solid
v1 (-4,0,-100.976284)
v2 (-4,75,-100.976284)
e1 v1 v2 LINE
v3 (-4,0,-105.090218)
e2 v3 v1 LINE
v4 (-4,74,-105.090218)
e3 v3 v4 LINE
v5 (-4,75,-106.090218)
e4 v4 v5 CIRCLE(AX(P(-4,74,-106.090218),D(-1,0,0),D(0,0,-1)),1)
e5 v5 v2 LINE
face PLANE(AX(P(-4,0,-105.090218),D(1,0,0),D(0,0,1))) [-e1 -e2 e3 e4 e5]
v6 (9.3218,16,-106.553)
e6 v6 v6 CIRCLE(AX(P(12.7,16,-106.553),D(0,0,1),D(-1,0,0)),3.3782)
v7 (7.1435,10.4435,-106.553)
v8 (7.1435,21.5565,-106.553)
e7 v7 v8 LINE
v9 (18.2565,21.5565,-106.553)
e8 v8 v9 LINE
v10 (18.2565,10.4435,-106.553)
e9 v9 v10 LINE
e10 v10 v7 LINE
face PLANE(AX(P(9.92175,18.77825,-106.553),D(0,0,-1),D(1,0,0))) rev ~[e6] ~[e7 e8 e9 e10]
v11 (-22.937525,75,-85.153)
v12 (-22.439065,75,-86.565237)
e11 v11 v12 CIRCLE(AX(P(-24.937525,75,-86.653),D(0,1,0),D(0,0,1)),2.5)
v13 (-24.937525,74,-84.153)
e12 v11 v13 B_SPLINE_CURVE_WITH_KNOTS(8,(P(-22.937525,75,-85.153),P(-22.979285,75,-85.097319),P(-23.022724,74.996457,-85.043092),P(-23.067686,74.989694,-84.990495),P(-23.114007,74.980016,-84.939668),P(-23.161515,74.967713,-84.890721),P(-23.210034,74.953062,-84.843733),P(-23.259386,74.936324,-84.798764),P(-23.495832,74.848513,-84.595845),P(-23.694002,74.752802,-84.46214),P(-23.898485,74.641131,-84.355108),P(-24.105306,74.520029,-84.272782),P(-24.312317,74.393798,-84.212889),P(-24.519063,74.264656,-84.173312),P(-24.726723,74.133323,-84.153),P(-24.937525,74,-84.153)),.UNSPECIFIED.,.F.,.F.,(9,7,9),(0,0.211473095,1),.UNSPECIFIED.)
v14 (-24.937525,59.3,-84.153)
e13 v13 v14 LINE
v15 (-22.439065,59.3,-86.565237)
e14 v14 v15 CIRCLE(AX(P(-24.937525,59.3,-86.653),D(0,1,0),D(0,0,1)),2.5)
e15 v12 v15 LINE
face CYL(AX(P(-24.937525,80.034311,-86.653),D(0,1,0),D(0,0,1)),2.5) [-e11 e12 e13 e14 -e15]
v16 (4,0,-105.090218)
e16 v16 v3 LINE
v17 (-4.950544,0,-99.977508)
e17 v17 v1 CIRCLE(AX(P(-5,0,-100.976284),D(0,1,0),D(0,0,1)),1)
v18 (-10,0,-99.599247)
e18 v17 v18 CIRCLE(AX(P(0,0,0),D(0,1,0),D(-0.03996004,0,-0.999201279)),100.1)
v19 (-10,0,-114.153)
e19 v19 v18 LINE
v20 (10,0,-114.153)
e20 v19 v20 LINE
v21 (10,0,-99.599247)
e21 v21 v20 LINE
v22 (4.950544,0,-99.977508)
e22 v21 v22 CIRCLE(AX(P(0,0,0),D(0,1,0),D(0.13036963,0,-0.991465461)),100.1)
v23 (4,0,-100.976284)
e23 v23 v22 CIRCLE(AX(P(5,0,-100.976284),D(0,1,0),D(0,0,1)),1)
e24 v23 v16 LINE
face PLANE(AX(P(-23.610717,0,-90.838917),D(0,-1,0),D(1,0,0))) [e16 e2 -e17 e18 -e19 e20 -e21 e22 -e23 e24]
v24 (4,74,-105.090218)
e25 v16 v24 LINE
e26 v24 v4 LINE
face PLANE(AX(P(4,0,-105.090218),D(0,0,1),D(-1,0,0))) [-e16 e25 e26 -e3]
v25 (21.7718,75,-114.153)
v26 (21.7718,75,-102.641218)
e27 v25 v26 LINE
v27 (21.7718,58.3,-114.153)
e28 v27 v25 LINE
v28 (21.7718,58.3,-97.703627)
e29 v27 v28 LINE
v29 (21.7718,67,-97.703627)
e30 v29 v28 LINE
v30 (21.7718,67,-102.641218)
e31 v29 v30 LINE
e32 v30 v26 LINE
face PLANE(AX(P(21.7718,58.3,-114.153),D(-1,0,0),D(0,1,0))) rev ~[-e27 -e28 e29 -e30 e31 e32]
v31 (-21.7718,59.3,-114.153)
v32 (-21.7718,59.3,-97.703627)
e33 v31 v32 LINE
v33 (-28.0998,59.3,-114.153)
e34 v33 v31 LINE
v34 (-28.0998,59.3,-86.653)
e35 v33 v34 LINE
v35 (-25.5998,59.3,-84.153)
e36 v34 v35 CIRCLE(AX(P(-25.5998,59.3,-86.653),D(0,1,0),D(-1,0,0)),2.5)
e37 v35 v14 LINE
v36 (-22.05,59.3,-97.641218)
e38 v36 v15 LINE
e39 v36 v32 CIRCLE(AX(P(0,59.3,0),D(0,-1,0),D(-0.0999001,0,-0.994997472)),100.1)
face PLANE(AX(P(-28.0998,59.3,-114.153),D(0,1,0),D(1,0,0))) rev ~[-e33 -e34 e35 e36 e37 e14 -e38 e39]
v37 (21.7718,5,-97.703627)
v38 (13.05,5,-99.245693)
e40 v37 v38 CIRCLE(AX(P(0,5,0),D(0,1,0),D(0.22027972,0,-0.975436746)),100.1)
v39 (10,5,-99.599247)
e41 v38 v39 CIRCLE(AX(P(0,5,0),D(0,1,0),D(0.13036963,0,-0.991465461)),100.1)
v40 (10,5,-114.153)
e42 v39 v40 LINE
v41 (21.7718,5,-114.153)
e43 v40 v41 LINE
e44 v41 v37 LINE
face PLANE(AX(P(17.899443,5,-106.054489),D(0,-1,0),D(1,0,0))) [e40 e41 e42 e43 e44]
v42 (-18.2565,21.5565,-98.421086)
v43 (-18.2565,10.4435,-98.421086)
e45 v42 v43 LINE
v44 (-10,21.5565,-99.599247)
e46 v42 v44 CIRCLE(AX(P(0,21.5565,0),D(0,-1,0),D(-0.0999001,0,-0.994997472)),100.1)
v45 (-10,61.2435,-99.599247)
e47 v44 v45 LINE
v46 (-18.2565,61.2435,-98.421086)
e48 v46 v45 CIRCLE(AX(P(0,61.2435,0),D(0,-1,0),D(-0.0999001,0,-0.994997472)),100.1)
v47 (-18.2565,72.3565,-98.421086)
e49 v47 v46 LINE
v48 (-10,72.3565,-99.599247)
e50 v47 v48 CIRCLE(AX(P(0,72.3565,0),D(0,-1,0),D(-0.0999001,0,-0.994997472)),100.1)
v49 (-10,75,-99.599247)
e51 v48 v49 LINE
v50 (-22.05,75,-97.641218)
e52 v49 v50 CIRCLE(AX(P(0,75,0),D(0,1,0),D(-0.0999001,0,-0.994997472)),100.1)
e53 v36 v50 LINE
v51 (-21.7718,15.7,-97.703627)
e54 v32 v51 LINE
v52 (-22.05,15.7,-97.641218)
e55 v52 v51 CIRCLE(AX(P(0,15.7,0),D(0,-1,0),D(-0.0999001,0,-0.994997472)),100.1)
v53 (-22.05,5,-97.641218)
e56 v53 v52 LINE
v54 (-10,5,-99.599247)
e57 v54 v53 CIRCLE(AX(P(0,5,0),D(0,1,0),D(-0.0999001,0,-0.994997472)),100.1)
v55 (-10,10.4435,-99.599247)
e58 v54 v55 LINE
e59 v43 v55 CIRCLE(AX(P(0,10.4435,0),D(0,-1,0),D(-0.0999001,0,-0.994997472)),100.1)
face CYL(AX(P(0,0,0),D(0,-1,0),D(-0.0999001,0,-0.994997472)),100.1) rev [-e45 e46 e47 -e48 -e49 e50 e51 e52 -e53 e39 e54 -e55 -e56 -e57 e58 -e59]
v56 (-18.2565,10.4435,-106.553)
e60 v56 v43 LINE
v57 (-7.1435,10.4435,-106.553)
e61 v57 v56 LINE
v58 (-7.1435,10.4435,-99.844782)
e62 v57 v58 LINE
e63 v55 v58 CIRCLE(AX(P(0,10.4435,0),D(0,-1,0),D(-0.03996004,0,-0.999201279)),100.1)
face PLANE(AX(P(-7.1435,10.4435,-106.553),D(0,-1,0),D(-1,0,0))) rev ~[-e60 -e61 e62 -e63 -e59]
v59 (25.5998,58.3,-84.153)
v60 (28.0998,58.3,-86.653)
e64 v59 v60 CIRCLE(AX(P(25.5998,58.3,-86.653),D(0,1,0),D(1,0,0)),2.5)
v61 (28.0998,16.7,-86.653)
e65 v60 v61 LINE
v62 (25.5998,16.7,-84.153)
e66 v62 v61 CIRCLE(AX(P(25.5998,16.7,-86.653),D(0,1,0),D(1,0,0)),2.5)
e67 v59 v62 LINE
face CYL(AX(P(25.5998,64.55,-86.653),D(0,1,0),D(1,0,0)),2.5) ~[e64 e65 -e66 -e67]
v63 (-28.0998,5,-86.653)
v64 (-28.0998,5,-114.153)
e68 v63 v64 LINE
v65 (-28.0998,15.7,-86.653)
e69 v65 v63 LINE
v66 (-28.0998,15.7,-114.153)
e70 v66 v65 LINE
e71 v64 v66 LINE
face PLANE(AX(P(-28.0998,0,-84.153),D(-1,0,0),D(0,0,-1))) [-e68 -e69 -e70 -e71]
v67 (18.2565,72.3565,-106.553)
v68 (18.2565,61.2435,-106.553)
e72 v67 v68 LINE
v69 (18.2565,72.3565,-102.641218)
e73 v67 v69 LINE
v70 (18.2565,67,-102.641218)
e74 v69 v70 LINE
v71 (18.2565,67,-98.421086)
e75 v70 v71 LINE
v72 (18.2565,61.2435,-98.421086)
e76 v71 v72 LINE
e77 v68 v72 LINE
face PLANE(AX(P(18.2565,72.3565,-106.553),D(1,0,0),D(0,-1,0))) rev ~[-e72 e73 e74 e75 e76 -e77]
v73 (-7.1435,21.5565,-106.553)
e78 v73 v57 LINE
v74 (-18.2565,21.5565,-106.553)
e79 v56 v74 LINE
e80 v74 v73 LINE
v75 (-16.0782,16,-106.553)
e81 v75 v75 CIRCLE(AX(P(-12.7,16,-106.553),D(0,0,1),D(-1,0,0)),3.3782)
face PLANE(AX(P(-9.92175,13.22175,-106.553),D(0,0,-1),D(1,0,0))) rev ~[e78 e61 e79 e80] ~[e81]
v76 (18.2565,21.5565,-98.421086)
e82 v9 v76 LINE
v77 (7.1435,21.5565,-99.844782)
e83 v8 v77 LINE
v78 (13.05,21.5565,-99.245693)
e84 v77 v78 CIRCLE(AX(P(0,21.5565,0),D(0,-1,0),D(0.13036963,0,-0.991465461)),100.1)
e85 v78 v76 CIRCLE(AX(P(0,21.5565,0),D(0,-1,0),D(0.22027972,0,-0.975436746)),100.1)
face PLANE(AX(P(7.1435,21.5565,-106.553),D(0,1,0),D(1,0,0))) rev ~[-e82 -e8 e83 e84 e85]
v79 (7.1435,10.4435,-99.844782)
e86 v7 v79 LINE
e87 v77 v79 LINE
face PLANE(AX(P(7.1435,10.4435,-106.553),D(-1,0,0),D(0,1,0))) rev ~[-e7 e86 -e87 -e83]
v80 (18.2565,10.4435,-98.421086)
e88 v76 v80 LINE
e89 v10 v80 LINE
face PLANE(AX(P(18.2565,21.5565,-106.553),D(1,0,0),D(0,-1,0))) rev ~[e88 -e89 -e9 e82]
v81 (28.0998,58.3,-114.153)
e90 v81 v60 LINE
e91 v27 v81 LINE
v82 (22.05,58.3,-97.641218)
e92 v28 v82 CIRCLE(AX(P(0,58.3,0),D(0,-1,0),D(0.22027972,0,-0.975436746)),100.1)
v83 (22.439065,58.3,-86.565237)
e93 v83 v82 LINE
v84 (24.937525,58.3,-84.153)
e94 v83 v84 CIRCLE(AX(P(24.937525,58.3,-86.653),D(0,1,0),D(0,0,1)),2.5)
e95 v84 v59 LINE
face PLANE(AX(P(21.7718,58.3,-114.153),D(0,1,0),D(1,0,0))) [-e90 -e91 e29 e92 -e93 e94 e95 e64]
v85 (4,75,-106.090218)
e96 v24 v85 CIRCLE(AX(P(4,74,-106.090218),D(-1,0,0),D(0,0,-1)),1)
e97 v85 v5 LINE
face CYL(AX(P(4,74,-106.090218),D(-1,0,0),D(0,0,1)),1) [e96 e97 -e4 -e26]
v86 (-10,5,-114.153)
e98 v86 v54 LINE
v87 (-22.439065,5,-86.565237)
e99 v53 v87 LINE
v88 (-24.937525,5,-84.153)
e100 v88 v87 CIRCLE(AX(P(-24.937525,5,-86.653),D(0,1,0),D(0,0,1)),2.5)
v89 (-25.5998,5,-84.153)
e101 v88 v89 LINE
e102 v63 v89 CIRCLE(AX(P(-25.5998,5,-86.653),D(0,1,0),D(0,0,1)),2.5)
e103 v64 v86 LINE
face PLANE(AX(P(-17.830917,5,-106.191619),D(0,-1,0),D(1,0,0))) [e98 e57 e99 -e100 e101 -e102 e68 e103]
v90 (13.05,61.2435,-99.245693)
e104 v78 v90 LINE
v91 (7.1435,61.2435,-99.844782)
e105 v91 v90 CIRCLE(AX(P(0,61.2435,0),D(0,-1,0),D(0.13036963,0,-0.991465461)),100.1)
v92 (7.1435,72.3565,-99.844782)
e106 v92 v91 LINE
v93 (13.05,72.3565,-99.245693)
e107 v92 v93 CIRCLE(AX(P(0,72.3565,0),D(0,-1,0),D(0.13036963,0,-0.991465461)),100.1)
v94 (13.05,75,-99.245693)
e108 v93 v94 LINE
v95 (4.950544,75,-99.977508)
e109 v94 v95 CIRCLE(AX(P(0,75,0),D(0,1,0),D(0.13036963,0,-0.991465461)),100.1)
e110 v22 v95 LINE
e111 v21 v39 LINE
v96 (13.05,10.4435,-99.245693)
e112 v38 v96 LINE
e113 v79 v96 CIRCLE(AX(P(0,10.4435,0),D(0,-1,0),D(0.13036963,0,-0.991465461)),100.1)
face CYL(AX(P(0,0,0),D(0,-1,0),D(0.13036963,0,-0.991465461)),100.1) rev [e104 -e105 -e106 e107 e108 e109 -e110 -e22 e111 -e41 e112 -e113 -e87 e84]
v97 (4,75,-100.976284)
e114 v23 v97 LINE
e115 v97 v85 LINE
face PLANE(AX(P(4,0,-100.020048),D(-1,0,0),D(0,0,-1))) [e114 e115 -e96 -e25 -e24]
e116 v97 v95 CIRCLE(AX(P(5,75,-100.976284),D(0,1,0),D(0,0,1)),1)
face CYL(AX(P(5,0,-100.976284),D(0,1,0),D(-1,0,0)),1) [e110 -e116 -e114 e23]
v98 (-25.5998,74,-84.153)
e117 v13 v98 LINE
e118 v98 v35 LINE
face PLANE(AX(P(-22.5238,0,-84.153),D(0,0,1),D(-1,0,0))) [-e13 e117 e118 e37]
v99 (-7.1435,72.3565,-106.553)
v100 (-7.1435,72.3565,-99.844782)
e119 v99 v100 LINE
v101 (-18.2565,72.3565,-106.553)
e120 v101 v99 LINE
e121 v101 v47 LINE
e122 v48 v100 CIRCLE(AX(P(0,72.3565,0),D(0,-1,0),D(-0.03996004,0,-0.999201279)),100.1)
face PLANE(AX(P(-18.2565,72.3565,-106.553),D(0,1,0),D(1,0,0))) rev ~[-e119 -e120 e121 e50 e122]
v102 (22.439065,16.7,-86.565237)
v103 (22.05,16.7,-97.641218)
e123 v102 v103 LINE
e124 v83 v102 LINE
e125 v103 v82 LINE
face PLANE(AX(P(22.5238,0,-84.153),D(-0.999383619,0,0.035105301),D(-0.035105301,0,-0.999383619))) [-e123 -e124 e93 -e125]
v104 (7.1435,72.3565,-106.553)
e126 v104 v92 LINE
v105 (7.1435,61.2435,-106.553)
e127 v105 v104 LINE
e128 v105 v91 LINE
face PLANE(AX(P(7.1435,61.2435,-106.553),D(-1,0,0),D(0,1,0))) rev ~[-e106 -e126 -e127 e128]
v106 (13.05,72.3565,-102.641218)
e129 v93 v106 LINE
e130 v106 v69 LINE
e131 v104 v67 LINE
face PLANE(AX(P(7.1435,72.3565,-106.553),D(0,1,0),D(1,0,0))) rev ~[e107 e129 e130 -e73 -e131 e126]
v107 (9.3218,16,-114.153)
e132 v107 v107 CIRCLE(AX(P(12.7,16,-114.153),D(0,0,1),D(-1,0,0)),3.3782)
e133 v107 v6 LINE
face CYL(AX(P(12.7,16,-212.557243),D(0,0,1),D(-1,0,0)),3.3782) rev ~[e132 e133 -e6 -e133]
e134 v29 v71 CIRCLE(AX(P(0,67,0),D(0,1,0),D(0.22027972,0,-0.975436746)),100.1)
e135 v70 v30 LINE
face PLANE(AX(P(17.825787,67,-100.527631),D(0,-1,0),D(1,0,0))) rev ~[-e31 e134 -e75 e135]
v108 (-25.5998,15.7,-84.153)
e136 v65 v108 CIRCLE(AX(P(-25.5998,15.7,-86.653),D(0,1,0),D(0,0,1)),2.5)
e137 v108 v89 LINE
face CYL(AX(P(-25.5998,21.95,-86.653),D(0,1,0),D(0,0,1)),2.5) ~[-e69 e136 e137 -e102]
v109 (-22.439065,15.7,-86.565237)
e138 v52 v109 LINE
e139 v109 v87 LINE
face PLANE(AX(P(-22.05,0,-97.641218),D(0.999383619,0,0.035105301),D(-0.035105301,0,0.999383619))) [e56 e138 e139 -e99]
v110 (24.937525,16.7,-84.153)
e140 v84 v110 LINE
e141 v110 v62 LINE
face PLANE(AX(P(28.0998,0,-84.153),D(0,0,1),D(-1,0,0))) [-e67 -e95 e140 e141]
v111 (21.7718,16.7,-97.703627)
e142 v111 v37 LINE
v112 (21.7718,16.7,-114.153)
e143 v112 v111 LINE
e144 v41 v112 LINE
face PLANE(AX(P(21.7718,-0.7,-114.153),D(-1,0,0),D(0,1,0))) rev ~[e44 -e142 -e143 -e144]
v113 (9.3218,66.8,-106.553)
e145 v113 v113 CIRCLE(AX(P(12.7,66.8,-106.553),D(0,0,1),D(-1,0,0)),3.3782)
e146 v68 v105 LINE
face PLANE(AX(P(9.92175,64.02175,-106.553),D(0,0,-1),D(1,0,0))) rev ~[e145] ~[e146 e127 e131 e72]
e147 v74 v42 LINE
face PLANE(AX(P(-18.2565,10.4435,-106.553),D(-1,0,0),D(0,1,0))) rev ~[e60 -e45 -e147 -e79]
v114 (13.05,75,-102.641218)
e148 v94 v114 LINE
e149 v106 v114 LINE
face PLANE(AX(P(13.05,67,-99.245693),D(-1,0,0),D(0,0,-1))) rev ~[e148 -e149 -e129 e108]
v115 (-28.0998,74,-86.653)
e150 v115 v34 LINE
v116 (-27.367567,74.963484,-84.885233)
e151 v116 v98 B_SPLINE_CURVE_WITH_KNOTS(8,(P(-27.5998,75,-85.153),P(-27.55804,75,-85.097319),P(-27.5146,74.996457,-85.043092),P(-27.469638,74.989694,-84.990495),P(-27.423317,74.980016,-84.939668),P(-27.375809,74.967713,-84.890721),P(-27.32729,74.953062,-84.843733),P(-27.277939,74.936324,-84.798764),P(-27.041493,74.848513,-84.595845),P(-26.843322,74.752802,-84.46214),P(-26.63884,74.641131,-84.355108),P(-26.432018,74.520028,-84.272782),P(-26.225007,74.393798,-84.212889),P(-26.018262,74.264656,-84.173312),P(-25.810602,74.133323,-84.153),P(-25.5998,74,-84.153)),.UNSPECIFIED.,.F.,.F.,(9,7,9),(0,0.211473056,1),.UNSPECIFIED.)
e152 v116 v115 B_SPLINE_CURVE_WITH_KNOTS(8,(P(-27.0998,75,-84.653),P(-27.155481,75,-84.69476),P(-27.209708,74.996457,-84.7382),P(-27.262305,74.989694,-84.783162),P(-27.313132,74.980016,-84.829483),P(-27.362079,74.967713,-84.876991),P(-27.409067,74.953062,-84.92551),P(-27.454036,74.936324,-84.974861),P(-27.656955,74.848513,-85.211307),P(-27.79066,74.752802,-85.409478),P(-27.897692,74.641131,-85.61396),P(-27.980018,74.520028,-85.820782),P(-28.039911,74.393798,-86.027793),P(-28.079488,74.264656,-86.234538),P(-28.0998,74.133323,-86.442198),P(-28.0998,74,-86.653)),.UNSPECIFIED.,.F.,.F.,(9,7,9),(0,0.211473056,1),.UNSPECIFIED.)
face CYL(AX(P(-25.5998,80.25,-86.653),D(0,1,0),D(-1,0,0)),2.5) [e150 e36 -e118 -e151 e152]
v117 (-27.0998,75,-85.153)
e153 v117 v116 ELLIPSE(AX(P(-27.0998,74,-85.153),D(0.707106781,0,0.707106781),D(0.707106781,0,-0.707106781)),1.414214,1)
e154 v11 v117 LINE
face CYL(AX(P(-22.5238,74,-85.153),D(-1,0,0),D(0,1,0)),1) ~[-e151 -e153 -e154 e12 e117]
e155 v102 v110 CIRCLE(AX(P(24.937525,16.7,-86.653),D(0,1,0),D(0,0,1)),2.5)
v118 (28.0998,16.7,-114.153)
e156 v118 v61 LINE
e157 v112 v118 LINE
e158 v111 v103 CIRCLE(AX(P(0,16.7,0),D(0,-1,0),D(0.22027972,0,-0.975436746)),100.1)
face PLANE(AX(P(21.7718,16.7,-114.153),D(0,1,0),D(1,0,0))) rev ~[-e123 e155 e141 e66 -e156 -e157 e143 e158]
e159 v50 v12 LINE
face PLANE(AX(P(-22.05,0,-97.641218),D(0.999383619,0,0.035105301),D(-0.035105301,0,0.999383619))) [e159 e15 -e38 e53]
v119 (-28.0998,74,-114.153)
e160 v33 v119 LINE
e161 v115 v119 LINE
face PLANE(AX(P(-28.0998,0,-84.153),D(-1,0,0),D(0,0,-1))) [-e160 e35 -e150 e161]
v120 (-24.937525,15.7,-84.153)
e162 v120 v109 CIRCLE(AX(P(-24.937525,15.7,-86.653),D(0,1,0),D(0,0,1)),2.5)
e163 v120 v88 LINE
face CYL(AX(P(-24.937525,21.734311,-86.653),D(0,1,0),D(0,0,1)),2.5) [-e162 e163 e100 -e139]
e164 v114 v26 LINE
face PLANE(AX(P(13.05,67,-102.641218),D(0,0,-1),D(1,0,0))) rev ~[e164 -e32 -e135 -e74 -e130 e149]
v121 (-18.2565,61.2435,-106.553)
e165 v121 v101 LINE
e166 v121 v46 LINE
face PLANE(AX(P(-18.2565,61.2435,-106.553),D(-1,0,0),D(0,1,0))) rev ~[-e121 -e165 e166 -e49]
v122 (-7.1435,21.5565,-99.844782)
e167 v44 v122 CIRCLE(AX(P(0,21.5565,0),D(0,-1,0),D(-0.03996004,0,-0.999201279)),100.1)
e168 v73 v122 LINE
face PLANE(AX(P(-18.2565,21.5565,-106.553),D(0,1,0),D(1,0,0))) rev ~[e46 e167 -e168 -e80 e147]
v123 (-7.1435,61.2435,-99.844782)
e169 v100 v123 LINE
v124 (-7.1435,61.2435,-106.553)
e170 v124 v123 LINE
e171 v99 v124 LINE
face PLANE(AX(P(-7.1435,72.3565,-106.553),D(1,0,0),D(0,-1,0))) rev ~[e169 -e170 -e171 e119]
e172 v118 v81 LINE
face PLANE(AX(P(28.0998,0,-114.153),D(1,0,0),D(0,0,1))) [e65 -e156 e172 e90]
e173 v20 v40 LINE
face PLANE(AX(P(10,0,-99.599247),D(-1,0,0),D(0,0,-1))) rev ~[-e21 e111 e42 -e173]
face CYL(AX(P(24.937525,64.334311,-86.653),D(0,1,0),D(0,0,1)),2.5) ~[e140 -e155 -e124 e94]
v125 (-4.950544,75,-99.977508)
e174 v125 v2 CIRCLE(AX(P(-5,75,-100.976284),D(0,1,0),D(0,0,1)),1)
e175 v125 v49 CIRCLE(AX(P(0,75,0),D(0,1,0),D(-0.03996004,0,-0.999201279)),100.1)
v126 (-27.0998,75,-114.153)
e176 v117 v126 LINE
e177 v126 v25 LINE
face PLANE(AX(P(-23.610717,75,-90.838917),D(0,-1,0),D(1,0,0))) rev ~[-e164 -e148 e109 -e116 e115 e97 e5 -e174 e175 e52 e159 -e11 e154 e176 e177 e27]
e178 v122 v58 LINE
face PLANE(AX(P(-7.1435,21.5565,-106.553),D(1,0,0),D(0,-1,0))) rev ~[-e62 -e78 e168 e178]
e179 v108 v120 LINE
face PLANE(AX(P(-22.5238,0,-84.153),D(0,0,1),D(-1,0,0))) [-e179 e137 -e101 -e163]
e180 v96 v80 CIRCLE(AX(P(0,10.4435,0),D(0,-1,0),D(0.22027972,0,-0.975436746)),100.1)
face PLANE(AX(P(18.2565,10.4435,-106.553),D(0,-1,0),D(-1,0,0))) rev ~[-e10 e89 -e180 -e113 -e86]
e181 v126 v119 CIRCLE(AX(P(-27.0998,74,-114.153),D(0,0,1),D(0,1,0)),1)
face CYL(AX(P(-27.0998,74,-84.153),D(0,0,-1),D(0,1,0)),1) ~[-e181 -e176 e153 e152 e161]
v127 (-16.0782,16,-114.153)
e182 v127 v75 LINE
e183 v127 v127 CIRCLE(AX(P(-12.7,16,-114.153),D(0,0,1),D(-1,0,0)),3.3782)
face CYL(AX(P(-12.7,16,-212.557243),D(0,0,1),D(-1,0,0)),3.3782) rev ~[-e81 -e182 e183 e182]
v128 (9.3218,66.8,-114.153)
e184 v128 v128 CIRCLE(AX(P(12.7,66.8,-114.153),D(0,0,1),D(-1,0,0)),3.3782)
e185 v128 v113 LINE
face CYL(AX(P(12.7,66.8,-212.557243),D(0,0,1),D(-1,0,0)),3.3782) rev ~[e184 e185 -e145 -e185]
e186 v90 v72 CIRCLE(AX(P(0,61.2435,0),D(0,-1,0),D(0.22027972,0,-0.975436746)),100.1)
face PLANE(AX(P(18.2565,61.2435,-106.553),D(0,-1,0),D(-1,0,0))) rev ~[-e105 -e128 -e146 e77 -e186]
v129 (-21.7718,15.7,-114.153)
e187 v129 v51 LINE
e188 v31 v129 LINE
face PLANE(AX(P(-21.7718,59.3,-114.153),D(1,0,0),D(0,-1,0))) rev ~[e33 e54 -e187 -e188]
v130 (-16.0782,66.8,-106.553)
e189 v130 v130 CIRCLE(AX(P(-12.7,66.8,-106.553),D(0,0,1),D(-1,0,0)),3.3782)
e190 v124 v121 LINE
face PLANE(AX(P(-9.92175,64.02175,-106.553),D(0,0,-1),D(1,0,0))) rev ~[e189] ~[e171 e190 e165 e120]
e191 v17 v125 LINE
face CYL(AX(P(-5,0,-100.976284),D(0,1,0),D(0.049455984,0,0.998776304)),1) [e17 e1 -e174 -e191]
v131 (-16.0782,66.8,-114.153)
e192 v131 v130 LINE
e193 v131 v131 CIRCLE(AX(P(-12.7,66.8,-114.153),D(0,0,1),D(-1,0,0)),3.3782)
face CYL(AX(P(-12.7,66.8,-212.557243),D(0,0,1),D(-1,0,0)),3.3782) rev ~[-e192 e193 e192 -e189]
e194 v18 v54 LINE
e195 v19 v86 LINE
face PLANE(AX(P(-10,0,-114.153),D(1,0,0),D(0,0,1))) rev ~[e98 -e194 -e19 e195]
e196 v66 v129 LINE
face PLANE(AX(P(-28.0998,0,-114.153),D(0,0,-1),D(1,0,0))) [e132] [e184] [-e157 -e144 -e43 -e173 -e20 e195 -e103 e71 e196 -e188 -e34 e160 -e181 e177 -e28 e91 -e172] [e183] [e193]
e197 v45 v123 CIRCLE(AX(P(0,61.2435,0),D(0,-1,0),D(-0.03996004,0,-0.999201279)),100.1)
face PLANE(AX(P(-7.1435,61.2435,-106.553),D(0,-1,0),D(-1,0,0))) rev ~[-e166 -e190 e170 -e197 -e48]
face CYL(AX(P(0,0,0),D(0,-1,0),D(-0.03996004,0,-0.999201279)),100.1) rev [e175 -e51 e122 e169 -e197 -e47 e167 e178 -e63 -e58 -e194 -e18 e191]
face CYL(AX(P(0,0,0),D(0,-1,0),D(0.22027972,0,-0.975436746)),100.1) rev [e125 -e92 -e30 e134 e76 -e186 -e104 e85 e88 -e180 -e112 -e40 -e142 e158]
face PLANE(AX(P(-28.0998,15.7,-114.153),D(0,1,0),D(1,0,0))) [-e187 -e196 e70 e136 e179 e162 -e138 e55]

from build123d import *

# Parameters (mm, degrees)
F1_DEPTH     = 75
F3_START     = -67
F3_DEPTH     = 8
F4_D         = 6.7564
F5_START     = -7.6
F2_W         = 5.5565
F2_H         = 5.5565
F5_DEPTH     = 22.401
F2_W_2       = 6.328
F2_H_2       = 8.3
F2_H_3       = 43.6
F2_H_4       = 8.4
F2_H_5       = 16.7
F2_H_6       = 0.7
F6_DEPTH     = 30
F7_R         = 1
F8_DEPTH     = 5
F9_T1_DEPTH  = 23.2
F9_T3_DEPTH  = 22.7686226101
F9_T5_DEPTH  = 27.2
F9_T7_DEPTH  = 26.7686226101
F9_T9_DEPTH  = 53.6686226101
F9_T11_DEPTH = 54.1


# Not quite as in the source:
# - a fillet or chamfer that OpenCascade refuses, or shapes differently, is made with other operations: its cross-section is extruded or revolved along the edge and cut away or added
# - a feature names something its author has since deleted; it is built from what else it names


with BuildPart() as f1:
    # F0 (on Front) → F1 (new body)
    with BuildSketch(Plane.XZ):
        with BuildLine():
            Line((-25, -84.153), (-25, -96.9278597721))
            ThreePointArc((-25, -96.9278597721), (-23.5277037783, -97.2957201264), (-22.05, -97.6412182431))
            Line((-22.05, -97.6412182431), (-22.5238, -84.153))
            Line((-22.5238, -84.153), (-25, -84.153))
        make_face()
        with BuildLine():
            ThreePointArc((22.05, -97.6412182431), (23.5277037782, -97.2957201264), (25, -96.9278597721))
            Line((25, -96.9278597721), (25, -84.153))
            Line((25, -84.153), (22.5238, -84.153))
            Line((22.5238, -84.153), (22.05, -97.6412182431))
        make_face()
        with BuildLine():
            Line((22.05, -102.6412182431), (22.05, -97.6412182431))
            ThreePointArc((22.05, -97.6412182431), (17.5683261722, -98.5462526711), (13.05, -99.2456926017))
            Line((13.05, -99.2456926017), (13.05, -102.6412182431))
            Line((13.05, -102.6412182431), (22.05, -102.6412182431))
        make_face()
        with BuildLine():
            ThreePointArc((-4, -100.0200479904), (-7.0031613127, -99.8547231313), (-10, -99.5992469851))
            Line((-10, -99.5992469851), (-10, -114.153))
            Line((-10, -114.153), (0, -114.153))
            Line((0, -114.153), (10, -114.153))
            Line((10, -114.153), (10, -99.5992469851))
            ThreePointArc((10, -99.5992469851), (7.0031613127, -99.8547231313), (4, -100.0200479904))
            Line((4, -100.0200479904), (4, -105.0902182431))
            Line((4, -105.0902182431), (-4, -105.0902182431))
            Line((-4, -105.0902182431), (-4, -100.0200479904))
        make_face()
        with BuildLine():
            ThreePointArc((-25, -96.9278597721), (-26.5533240856, -96.5138900884), (-28.0998, -96.0750292217))
            Line((-28.0998, -96.0750292217), (-28.0998, -104.153))
            Line((-28.0998, -104.153), (-28.0998, -114.153))
            Line((-28.0998, -114.153), (-25, -114.153))
            Line((-25, -114.153), (-25, -96.9278597721))
        make_face()
        with BuildLine():
            Line((28.0998, -104.153), (28.0998, -96.0750292217))
            ThreePointArc((28.0998, -96.0750292217), (26.5533240856, -96.5138900884), (25, -96.9278597721))
            Line((25, -96.9278597721), (25, -114.153))
            Line((25, -114.153), (28.0998, -114.153))
            Line((28.0998, -114.153), (28.0998, -104.153))
        make_face()
        with BuildLine():
            ThreePointArc((25, -96.9278597721), (26.5533240856, -96.5138900884), (28.0998, -96.0750292217))
            Line((28.0998, -96.0750292217), (28.0998, -84.153))
            Line((28.0998, -84.153), (25, -84.153))
            Line((25, -84.153), (25, -96.9278597721))
        make_face()
        with BuildLine():
            Line((-28.0998, -84.153), (-28.0998, -96.0750292217))
            ThreePointArc((-28.0998, -96.0750292217), (-26.5533240856, -96.5138900884), (-25, -96.9278597721))
            Line((-25, -96.9278597721), (-25, -84.153))
            Line((-25, -84.153), (-28.0998, -84.153))
        make_face()
        with BuildLine():
            Line((25, -114.153), (25, -96.9278597721))
            ThreePointArc((25, -96.9278597721), (23.5277037782, -97.2957201264), (22.05, -97.6412182431))
            Line((22.05, -97.6412182431), (22.05, -102.6412182431))
            Line((22.05, -102.6412182431), (13.05, -102.6412182431))
            Line((13.05, -102.6412182431), (13.05, -99.2456926017))
            ThreePointArc((13.05, -99.2456926017), (11.5263556763, -99.4341647766), (10, -99.5992469851))
            Line((10, -99.5992469851), (10, -114.153))
            Line((10, -114.153), (22.5238, -114.153))
            Line((22.5238, -114.153), (25, -114.153))
        make_face()
        with BuildLine():
            ThreePointArc((-22.05, -97.6412182431), (-23.5277037783, -97.2957201264), (-25, -96.9278597721))
            Line((-25, -96.9278597721), (-25, -114.153))
            Line((-25, -114.153), (-22.5238, -114.153))
            Line((-22.5238, -114.153), (-10, -114.153))
            Line((-10, -114.153), (-10, -99.5992469851))
            ThreePointArc((-10, -99.5992469851), (-16.0548775809, -98.8041036894), (-22.05, -97.6412182431))
        make_face()
    extrude(amount=-F1_DEPTH)

    # F0 (on Front) → F3 (cut)
    with BuildSketch(Plane.XZ.offset(F3_START)):
        with BuildLine():
            Line((22.05, -102.6412182431), (22.05, -97.6412182431))
            ThreePointArc((22.05, -97.6412182431), (17.5683261722, -98.5462526711), (13.05, -99.2456926017))
            Line((13.05, -99.2456926017), (13.05, -102.6412182431))
            Line((13.05, -102.6412182431), (22.05, -102.6412182431))
        make_face()
    extrude(amount=-F3_DEPTH, mode=Mode.SUBTRACT)

    # F4 (through all)
    with Locations(Plane(origin=(0, 0, -114.153), x_dir=(1, 0, 0), z_dir=(0, 0, -1))):
        with Locations((-12.7, -168.4), (12.7, -168.4), (-12.7, -117.6), (12.7, -117.6), (-12.7, -66.8), (12.7, -66.8), (-12.7, -16), (12.7, -16)):
            Hole(F4_D / 2)

    # F2 (on face) → F5 (cut)
    with BuildSketch(Plane(origin=(0, 0, -114.153), x_dir=(1, 0, 0), z_dir=(0, 0, -1)).offset(F5_START)):
        Polygon((-12.7, -173.9565), (-12.7, -168.4), (-12.7, -162.8435), (-18.2565, -162.8435), (-18.2565, -173.9565), align=None)
        with Locations((-9.92175, -165.62175)):
            Rectangle(F2_W, F2_H)
        with Locations((-9.92175, -171.17825)):
            Rectangle(F2_W, F2_H)
        with Locations((9.92175, -171.17825)):
            Rectangle(F2_W, F2_H)
        with Locations((9.92175, -165.62175)):
            Rectangle(F2_W, F2_H)
        Polygon((12.7, -162.8435), (12.7, -168.4), (12.7, -173.9565), (18.2565, -173.9565), (18.2565, -162.8435), align=None)
        Polygon((18.2565, -112.0435), (12.7, -112.0435), (12.7, -117.6), (12.7, -123.1565), (18.2565, -123.1565), align=None)
        with Locations((9.92175, -114.82175)):
            Rectangle(F2_W, F2_H)
        with Locations((9.92175, -120.37825)):
            Rectangle(F2_W, F2_H)
        with Locations((-9.92175, -120.37825)):
            Rectangle(F2_W, F2_H)
        with Locations((-9.92175, -114.82175)):
            Rectangle(F2_W, F2_H)
        Polygon((-12.7, -117.6), (-12.7, -112.0435), (-18.2565, -112.0435), (-18.2565, -123.1565), (-12.7, -123.1565), align=None)
        with Locations((-9.92175, -64.02175)):
            Rectangle(F2_W, F2_H)
        with Locations((-9.92175, -69.57825)):
            Rectangle(F2_W, F2_H)
        Polygon((-12.7, -72.3565), (-12.7, -66.8), (-12.7, -61.2435), (-18.2565, -61.2435), (-18.2565, -72.3565), align=None)
        with Locations((9.92175, -64.02175)):
            Rectangle(F2_W, F2_H)
        with Locations((9.92175, -69.57825)):
            Rectangle(F2_W, F2_H)
        Polygon((12.7, -61.2435), (12.7, -66.8), (12.7, -72.3565), (18.2565, -72.3565), (18.2565, -61.2435), align=None)
        with Locations((9.92175, -18.77825)):
            Rectangle(F2_W, F2_H)
        with Locations((9.92175, -13.22175)):
            Rectangle(F2_W, F2_H)
        Polygon((18.2565, -10.4435), (12.7, -10.4435), (12.7, -16), (12.7, -21.5565), (18.2565, -21.5565), align=None)
        with Locations((-9.92175, -13.22175)):
            Rectangle(F2_W, F2_H)
        Polygon((-12.7, -16), (-12.7, -10.4435), (-18.2565, -10.4435), (-18.2565, -21.5565), (-12.7, -21.5565), align=None)
        with Locations((-9.92175, -18.77825)):
            Rectangle(F2_W, F2_H)
    extrude(amount=-F5_DEPTH, mode=Mode.SUBTRACT)

    # F2 (on face) → F6 (cut, through all)
    with BuildSketch(Plane(origin=(0, 0, -114.153), x_dir=(1, 0, 0), z_dir=(0, 0, -1))):
        with Locations((24.9358, -70.85)):
            Rectangle(F2_W_2, F2_H_2)
        with Locations((-24.9358, -37.5)):
            Rectangle(F2_W_2, F2_H_3)
        with Locations((24.9358, -62.5)):
            Rectangle(F2_W_2, F2_H_4)
        with Locations((24.9358, -8.35)):
            Rectangle(F2_W_2, F2_H_5)
        with Locations((24.9358, 0.35)):
            Rectangle(F2_W_2, F2_H_6)
    extrude(amount=-F6_DEPTH, mode=Mode.SUBTRACT)

    # F7
    f7_edges = [f1.edges().sort_by_distance(p)[0] for p in [
        (-28.0998, 75, -99.153),
        (-4, 37.5, -100.020048),
        (4, 37.5, -100.020048),
        (0, 75, -105.090218),
        (-25.3118, 75, -84.153),
    ]]
    fillet(f7_edges, radius=F7_R)

    # F0 (on Front) → F8 (cut)
    with BuildSketch(Plane.XZ):
        with BuildLine():
            ThreePointArc((-22.05, -97.6412182431), (-23.5277037783, -97.2957201264), (-25, -96.9278597721))
            Line((-25, -96.9278597721), (-25, -114.153))
            Line((-25, -114.153), (-22.5238, -114.153))
            Line((-22.5238, -114.153), (-10, -114.153))
            Line((-10, -114.153), (-10, -99.5992469851))
            ThreePointArc((-10, -99.5992469851), (-16.0548775809, -98.8041036894), (-22.05, -97.6412182431))
        make_face()
        with BuildLine():
            Line((25, -114.153), (25, -96.9278597721))
            ThreePointArc((25, -96.9278597721), (23.5277037782, -97.2957201264), (22.05, -97.6412182431))
            Line((22.05, -97.6412182431), (22.05, -102.6412182431))
            Line((22.05, -102.6412182431), (13.05, -102.6412182431))
            Line((13.05, -102.6412182431), (13.05, -99.2456926017))
            ThreePointArc((13.05, -99.2456926017), (11.5263556763, -99.4341647766), (10, -99.5992469851))
            Line((10, -99.5992469851), (10, -114.153))
            Line((10, -114.153), (22.5238, -114.153))
            Line((22.5238, -114.153), (25, -114.153))
        make_face()
        with BuildLine():
            Line((22.05, -102.6412182431), (22.05, -97.6412182431))
            ThreePointArc((22.05, -97.6412182431), (17.5683261722, -98.5462526711), (13.05, -99.2456926017))
            Line((13.05, -99.2456926017), (13.05, -102.6412182431))
            Line((13.05, -102.6412182431), (22.05, -102.6412182431))
        make_face()
        with BuildLine():
            ThreePointArc((-25, -96.9278597721), (-26.5533240856, -96.5138900884), (-28.0998, -96.0750292217))
            Line((-28.0998, -96.0750292217), (-28.0998, -104.153))
            Line((-28.0998, -104.153), (-28.0998, -114.153))
            Line((-28.0998, -114.153), (-25, -114.153))
            Line((-25, -114.153), (-25, -96.9278597721))
        make_face()
        with BuildLine():
            Line((-28.0998, -84.153), (-28.0998, -96.0750292217))
            ThreePointArc((-28.0998, -96.0750292217), (-26.5533240856, -96.5138900884), (-25, -96.9278597721))
            Line((-25, -96.9278597721), (-25, -84.153))
            Line((-25, -84.153), (-28.0998, -84.153))
        make_face()
        with BuildLine():
            Line((-25, -84.153), (-25, -96.9278597721))
            ThreePointArc((-25, -96.9278597721), (-23.5277037783, -97.2957201264), (-22.05, -97.6412182431))
            Line((-22.05, -97.6412182431), (-22.5238, -84.153))
            Line((-22.5238, -84.153), (-25, -84.153))
        make_face()
    extrude(amount=-F8_DEPTH, mode=Mode.SUBTRACT)

    # F9: fillet of radius 2.5 on 6 edges, made by hand

    # F9_s2 → F9_t1 (cut)
    with BuildSketch(Plane.XZ.offset(-21.95)):
        with BuildLine():
            ThreePointArc((-25.5998, -84.153), (-27.367566953, -84.885233047), (-28.0998, -86.653))
            Line((-28.0998, -86.653), (-28.0998, -84.153))
            Line((-28.0998, -84.153), (-25.5998, -84.153))
        make_face()
    extrude(amount=F9_T1_DEPTH, mode=Mode.SUBTRACT)

    # F9_s4 → F9_t3 (cut)
    with BuildSketch(Plane.XZ.offset(-21.7343113051)):
        with BuildLine():
            ThreePointArc((-24.937524522, -84.153), (-23.2010637724, -84.8544716947), (-22.4390654746, -86.565236748))
            Line((-22.4390654746, -86.565236748), (-22.5238, -84.153))
            Line((-22.5238, -84.153), (-24.937524522, -84.153))
        make_face()
    extrude(amount=F9_T3_DEPTH, mode=Mode.SUBTRACT)

    # F9_s6 → F9_t5 (cut)
    with BuildSketch(Plane.XZ.offset(-80.25)):
        with BuildLine():
            ThreePointArc((-28.0998, -86.653), (-27.367566953, -84.885233047), (-25.5998, -84.153))
            Line((-25.5998, -84.153), (-28.0998, -84.153))
            Line((-28.0998, -84.153), (-28.0998, -86.653))
        make_face()
    extrude(amount=F9_T5_DEPTH, mode=Mode.SUBTRACT)

    # F9_s8 → F9_t7 (cut)
    with BuildSketch(Plane.XZ.offset(-80.0343113051)):
        with BuildLine():
            ThreePointArc((-24.937524522, -84.153), (-23.2010637724, -84.8544716947), (-22.4390654746, -86.565236748))
            Line((-22.4390654746, -86.565236748), (-22.5238, -84.153))
            Line((-22.5238, -84.153), (-24.937524522, -84.153))
        make_face()
    extrude(amount=F9_T7_DEPTH, mode=Mode.SUBTRACT)

    # F9_s10 → F9_t9 (cut)
    with BuildSketch(Plane.XZ.offset(-64.3343113051)):
        with BuildLine():
            ThreePointArc((24.937524522, -84.153), (23.2010637724, -84.8544716947), (22.4390654746, -86.565236748))
            Line((22.4390654746, -86.565236748), (22.5238, -84.153))
            Line((22.5238, -84.153), (24.937524522, -84.153))
        make_face()
    extrude(amount=F9_T9_DEPTH, mode=Mode.SUBTRACT)

    # F9_s12 → F9_t11 (cut)
    with BuildSketch(Plane.XZ.offset(-64.55)):
        with BuildLine():
            ThreePointArc((28.0998, -86.653), (27.367566953, -84.885233047), (25.5998, -84.153))
            Line((25.5998, -84.153), (28.0998, -84.153))
            Line((28.0998, -84.153), (28.0998, -86.653))
        make_face()
    extrude(amount=F9_T11_DEPTH, mode=Mode.SUBTRACT)


solid = f1.part
